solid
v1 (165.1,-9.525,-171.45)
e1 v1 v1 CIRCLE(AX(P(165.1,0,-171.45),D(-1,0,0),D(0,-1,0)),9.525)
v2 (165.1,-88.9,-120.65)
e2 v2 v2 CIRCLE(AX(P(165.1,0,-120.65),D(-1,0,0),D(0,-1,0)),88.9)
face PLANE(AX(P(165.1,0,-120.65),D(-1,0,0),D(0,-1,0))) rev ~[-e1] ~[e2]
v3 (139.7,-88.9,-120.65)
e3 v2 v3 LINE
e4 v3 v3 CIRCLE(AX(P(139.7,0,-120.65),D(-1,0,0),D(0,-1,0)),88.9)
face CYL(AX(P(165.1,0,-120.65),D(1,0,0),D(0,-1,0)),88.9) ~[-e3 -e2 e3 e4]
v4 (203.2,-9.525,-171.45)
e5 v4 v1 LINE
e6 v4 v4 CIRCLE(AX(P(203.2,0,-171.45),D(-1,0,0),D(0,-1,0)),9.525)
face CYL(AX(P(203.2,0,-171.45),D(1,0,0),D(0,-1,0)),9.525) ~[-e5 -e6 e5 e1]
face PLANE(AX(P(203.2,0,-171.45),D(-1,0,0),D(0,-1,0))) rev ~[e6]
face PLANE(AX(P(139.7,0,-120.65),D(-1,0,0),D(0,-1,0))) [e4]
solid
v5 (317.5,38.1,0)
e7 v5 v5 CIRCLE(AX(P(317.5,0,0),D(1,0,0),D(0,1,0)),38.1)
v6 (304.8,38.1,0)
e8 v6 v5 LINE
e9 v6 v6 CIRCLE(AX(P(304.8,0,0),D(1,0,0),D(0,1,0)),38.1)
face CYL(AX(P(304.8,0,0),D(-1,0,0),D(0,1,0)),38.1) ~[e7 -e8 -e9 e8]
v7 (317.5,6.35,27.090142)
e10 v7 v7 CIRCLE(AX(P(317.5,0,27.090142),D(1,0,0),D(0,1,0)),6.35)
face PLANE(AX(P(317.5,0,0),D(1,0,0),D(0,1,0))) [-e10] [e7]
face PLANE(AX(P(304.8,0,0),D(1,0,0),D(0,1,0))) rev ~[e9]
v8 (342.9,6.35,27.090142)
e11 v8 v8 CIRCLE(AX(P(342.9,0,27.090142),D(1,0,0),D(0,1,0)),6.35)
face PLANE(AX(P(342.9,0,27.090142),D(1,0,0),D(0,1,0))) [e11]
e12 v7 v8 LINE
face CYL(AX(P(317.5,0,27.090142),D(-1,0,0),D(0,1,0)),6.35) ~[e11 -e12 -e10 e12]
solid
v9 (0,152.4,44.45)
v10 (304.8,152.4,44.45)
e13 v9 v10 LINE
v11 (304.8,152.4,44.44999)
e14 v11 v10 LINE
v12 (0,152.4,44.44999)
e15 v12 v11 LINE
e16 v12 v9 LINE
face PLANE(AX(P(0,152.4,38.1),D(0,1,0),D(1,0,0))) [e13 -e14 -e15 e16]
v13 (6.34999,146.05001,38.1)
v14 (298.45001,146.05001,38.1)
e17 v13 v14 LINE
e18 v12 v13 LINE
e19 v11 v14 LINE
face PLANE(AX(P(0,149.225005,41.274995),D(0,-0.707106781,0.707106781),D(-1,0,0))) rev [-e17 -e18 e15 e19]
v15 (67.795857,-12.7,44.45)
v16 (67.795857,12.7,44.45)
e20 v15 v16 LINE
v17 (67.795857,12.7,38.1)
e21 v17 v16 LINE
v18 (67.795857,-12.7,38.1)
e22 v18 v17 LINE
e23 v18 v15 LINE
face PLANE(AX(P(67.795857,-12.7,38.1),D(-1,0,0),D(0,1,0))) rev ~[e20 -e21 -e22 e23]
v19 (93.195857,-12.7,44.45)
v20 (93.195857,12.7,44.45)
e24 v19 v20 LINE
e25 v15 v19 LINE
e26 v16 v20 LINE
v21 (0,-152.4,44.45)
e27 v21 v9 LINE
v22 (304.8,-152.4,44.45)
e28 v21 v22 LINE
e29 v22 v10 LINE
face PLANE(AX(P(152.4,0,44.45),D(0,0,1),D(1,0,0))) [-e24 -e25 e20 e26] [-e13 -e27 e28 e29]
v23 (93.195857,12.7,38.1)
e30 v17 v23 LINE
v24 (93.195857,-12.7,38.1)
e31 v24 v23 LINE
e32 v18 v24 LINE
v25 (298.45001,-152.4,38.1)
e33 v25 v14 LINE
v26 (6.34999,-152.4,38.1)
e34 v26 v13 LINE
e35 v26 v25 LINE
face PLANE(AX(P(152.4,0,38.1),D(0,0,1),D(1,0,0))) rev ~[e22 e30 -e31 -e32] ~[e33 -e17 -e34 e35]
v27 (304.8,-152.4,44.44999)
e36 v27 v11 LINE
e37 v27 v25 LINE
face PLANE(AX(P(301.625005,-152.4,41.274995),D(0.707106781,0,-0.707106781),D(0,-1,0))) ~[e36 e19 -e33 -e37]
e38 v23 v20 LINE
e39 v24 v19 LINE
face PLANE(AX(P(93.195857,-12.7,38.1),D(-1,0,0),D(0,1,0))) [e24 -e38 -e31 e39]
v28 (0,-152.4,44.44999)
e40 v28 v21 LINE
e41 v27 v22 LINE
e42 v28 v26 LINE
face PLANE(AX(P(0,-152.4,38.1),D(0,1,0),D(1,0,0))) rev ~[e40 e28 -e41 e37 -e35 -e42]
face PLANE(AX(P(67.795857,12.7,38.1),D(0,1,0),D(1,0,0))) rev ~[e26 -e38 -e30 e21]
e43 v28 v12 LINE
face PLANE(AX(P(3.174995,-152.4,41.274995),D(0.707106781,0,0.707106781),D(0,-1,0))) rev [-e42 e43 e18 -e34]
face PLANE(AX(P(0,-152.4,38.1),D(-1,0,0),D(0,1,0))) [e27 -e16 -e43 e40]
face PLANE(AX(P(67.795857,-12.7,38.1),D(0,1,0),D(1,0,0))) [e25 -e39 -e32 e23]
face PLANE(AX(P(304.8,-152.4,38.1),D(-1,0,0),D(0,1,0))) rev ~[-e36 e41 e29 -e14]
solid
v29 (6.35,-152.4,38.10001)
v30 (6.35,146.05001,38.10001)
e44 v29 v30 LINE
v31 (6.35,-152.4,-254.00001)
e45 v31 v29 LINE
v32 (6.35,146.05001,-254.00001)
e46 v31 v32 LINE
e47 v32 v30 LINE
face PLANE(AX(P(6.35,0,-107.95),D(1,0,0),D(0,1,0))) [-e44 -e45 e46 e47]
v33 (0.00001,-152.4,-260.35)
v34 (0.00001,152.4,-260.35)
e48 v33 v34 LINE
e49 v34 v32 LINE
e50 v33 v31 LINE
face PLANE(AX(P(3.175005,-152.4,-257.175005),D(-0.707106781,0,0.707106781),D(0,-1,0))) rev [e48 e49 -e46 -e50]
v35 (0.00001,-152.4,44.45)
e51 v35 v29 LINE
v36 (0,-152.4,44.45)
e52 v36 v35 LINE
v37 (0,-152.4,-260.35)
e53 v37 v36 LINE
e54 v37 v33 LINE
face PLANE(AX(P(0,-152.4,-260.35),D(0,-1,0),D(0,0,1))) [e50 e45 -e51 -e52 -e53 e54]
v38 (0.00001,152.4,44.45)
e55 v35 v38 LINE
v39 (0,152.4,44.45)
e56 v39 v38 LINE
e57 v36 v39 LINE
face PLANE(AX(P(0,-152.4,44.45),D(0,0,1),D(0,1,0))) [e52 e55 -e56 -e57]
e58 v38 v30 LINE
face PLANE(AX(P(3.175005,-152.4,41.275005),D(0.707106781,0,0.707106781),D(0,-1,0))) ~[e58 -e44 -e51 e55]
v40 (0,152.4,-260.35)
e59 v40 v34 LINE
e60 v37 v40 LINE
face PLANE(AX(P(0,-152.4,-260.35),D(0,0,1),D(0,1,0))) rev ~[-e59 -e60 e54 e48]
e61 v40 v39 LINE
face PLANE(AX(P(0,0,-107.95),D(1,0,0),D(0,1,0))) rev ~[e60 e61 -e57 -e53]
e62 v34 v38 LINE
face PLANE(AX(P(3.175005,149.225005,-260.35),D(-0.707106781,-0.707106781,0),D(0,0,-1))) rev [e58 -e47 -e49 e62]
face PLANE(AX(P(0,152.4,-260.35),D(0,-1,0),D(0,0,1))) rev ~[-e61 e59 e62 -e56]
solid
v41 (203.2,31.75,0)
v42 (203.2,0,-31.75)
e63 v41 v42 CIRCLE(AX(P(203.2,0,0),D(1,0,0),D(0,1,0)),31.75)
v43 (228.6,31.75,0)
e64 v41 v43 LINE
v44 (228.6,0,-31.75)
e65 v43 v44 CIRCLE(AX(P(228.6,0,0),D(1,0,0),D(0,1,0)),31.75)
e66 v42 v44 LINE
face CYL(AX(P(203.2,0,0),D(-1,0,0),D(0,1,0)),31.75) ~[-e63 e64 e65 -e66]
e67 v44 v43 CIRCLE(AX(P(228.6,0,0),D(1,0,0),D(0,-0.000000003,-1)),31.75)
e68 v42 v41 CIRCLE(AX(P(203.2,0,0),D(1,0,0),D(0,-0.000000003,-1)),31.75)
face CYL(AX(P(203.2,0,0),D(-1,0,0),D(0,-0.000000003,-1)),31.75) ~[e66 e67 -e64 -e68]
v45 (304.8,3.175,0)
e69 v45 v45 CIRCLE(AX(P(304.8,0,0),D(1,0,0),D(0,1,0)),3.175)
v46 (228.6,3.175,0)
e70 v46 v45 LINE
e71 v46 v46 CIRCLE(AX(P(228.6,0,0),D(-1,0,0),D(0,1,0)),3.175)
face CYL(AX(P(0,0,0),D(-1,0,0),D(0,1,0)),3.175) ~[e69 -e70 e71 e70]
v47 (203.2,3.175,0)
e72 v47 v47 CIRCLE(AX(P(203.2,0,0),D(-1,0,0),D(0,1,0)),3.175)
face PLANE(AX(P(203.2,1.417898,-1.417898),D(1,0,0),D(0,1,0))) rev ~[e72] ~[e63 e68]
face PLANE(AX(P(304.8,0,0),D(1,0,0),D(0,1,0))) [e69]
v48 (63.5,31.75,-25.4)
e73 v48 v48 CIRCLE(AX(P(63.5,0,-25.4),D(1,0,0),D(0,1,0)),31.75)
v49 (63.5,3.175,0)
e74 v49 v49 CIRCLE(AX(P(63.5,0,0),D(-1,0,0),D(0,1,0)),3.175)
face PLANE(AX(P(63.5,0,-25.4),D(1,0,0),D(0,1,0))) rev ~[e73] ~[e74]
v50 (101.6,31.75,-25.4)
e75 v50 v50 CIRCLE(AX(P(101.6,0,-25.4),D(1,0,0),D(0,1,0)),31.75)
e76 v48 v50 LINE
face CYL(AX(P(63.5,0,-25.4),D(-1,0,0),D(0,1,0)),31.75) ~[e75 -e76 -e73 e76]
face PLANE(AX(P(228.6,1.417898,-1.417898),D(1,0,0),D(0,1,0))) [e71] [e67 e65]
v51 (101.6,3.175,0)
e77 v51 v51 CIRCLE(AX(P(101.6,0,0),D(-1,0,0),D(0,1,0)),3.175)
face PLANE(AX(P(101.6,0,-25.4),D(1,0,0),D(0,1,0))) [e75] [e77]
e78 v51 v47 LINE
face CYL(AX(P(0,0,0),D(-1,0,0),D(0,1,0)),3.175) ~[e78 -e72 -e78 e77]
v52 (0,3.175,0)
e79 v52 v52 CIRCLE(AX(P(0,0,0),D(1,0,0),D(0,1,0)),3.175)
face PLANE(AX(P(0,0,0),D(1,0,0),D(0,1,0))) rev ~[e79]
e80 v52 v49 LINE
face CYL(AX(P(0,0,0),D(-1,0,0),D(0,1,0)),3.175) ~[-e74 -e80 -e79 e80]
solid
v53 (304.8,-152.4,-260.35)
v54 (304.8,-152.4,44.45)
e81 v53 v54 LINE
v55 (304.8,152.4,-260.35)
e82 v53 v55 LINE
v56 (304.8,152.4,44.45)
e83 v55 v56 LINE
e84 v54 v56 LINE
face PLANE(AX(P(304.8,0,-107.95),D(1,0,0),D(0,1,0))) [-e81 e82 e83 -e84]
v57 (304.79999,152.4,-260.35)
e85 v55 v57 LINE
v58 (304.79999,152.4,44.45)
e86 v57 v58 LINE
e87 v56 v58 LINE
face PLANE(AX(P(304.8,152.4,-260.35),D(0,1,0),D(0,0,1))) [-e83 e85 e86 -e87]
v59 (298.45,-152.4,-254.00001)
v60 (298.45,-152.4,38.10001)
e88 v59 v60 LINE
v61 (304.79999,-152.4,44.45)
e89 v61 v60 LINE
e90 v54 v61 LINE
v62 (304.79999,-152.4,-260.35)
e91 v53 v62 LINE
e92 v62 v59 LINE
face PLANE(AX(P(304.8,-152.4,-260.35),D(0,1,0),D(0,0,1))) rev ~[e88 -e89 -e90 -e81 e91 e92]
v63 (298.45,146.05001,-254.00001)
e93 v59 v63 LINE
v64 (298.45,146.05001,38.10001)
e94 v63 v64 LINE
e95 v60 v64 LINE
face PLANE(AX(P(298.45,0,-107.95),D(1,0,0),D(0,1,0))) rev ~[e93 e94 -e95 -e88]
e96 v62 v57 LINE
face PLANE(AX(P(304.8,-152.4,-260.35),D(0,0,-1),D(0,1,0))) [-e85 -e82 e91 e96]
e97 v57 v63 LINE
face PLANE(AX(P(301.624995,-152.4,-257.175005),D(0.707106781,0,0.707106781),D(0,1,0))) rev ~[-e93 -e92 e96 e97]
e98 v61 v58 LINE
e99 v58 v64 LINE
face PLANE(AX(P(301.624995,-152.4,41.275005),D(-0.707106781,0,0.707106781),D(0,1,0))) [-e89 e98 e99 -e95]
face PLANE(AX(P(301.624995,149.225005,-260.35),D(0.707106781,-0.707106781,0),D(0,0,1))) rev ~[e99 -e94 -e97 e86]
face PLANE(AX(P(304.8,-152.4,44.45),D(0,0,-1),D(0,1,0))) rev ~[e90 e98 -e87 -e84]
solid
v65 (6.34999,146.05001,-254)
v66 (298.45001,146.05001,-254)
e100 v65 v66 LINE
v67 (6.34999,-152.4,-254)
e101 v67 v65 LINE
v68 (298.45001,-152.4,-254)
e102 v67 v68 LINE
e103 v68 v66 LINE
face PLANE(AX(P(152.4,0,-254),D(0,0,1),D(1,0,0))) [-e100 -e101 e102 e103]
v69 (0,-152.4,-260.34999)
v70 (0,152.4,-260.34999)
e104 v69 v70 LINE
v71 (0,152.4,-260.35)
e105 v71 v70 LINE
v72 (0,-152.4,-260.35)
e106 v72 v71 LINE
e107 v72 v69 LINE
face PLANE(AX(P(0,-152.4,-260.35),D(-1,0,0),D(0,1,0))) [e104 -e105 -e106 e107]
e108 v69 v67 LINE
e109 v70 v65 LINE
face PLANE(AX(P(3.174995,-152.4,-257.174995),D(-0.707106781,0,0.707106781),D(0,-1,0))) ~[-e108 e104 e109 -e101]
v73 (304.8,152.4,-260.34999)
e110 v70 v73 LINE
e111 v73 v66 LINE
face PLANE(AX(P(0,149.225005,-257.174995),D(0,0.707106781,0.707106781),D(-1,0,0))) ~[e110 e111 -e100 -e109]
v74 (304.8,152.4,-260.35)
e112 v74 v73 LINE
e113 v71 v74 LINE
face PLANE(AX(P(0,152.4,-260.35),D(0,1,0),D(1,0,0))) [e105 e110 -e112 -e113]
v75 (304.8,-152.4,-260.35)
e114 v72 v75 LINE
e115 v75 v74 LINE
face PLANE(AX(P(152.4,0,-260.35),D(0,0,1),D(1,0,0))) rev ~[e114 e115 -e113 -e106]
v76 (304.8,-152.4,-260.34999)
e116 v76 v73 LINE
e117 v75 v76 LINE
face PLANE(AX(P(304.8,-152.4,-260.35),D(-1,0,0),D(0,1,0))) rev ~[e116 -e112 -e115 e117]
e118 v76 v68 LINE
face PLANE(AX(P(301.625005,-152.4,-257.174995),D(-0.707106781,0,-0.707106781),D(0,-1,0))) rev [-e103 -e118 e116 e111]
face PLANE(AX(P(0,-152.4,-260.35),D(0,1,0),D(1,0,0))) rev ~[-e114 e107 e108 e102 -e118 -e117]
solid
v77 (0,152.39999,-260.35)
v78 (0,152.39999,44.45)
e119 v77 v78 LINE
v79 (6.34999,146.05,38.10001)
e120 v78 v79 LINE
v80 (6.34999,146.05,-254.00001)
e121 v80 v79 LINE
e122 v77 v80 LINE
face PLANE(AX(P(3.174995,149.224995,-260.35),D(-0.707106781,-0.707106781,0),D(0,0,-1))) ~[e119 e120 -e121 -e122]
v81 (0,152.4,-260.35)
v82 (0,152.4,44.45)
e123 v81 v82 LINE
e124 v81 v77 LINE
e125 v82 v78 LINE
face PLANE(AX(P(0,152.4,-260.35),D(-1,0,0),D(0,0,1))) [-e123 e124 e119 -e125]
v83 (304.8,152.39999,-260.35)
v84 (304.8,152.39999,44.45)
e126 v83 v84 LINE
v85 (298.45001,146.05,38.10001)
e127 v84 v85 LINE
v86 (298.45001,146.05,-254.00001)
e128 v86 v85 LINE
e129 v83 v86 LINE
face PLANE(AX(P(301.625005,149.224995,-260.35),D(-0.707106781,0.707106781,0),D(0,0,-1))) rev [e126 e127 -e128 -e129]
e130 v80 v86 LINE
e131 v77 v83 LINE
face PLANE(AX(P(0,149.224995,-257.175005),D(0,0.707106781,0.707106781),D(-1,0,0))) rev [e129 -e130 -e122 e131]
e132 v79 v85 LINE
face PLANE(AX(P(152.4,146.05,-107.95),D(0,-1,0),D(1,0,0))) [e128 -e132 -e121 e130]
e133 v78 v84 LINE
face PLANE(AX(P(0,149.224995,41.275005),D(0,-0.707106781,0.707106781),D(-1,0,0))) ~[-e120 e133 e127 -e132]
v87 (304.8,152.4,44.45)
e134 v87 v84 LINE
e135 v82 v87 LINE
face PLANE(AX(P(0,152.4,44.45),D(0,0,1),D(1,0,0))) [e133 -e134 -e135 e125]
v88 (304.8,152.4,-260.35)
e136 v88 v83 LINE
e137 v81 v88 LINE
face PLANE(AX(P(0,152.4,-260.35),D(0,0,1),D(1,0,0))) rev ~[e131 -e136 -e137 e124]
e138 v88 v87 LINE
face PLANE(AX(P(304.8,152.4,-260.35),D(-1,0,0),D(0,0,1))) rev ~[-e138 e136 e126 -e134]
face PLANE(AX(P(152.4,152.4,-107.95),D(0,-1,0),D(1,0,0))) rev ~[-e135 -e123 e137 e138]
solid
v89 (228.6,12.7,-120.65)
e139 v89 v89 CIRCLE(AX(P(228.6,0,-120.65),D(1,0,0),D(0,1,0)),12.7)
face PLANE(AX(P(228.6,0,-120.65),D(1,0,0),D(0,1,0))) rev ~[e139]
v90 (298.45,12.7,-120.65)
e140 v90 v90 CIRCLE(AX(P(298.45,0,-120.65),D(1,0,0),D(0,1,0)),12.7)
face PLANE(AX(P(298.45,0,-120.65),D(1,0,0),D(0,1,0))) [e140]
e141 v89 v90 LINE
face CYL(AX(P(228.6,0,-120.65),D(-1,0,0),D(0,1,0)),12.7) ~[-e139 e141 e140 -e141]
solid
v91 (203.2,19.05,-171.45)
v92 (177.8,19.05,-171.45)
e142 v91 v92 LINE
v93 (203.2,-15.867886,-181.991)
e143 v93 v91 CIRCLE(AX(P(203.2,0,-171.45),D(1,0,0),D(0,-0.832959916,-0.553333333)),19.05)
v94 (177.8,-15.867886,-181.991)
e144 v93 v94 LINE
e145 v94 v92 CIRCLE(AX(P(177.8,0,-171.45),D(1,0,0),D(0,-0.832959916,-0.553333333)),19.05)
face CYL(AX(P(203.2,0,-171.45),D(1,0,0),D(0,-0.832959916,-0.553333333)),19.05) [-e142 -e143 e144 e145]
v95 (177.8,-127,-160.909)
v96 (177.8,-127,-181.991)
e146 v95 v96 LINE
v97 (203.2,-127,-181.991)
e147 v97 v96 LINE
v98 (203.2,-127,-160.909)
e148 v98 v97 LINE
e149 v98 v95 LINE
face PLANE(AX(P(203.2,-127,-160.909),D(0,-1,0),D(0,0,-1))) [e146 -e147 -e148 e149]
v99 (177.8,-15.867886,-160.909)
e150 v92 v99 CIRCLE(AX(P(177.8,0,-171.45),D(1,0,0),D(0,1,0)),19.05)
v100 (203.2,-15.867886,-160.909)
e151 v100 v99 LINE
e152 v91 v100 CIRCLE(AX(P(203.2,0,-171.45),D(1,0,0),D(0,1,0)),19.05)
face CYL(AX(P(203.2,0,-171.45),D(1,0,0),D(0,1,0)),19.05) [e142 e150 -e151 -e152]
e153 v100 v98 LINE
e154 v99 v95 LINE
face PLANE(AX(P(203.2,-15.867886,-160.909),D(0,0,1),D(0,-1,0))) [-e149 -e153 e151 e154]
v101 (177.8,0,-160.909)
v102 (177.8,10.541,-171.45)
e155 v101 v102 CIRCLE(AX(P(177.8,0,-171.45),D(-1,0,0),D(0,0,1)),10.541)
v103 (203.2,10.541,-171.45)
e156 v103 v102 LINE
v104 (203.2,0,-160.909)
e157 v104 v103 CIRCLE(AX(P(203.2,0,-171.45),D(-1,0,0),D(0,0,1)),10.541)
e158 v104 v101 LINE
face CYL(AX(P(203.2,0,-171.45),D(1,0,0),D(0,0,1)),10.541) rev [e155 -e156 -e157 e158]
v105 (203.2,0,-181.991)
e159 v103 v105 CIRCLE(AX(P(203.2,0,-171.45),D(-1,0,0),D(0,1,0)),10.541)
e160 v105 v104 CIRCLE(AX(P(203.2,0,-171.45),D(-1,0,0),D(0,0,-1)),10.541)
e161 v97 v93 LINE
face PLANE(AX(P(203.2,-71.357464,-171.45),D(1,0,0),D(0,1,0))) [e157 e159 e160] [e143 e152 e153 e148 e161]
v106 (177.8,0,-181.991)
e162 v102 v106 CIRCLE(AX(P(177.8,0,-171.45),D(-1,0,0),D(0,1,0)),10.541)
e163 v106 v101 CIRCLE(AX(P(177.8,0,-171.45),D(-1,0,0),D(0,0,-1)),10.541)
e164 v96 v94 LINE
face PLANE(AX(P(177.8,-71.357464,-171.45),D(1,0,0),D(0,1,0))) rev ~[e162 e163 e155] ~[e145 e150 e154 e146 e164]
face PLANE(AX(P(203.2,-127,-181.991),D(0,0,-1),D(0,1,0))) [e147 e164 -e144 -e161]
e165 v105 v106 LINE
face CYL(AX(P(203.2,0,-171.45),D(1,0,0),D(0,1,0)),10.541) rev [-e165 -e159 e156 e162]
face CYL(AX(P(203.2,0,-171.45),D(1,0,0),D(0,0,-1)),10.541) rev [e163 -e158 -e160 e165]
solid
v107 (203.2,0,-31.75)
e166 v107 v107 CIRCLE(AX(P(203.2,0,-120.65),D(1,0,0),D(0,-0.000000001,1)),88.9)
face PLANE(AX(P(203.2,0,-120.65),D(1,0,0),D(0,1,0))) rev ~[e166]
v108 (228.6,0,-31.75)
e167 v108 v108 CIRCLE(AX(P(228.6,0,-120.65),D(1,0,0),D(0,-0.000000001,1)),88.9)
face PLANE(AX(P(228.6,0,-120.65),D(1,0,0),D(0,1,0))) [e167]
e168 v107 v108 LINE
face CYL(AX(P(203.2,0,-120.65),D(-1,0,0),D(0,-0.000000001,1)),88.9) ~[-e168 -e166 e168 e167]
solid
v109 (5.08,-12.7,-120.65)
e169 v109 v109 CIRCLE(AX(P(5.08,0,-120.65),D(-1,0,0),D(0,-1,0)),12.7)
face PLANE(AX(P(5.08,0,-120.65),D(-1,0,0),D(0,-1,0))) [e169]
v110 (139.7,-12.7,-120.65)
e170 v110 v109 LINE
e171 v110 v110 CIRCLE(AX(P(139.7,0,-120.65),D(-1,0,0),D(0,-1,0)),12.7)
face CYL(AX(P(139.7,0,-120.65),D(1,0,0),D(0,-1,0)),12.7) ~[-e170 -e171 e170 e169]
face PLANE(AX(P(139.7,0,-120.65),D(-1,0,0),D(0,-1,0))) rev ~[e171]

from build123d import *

# Parameters (mm, degrees)
F0_R      = 3.175
F1_DEPTH  = 304.8
F3_R      = 31.75
F4_DEPTH  = 38.1
F6_W      = 304.8
F6_H      = 304.8
F6_W_2    = 25.4
F6_H_2    = 25.4
F7_DEPTH  = 6.35
F8_SIZE   = 6.34999
F9_W      = 304.8
F9_H      = 304.8
F10_DEPTH = 6.35
F11_SIZE  = 6.34999
F13_W     = 304.8
F13_H     = 304.8
F14_DEPTH = 6.35
F15_SIZE  = 6.34999
F17_W     = 304.8
F17_H     = 304.8
F18_DEPTH = 6.35
F19_SIZE  = 6.34999
F22_DEPTH = 25.4
F23_R     = 9.525
F24_DEPTH = 38.1
F26_W     = 304.8
F26_H     = 304.8
F27_DEPTH = 6.35
F28_SIZE  = 6.34999
F29_R     = 38.1
F30_DEPTH = 12.7
F31_R     = 6.35
F32_DEPTH = 25.4
F33_R     = 12.7
F34_DEPTH = 69.85
F36_R     = 88.9
F37_DEPTH = 25.4
F38_R     = 12.7
F39_DEPTH = 134.62
F41_DEPTH = 25.4


# Not quite as in the source:
# - a fillet or chamfer is up to 0.001 mm smaller than in the source, because OpenCascade refuses the exact size
# - a feature of the source that left no trace in its solid (it failed there, or was rolled back) is left out


with BuildPart() as f1:
    # F0 (on Right) → F1 (new body)
    with BuildSketch(Plane.YZ):
        Circle(F0_R)
    extrude(amount=F1_DEPTH)

    # F3 (on offset) → F4 (join)
    with BuildSketch(Plane.YZ.offset(63.5)):
        with Locations((0, -25.4)):
            Circle(F3_R)
    extrude(amount=F4_DEPTH)

    # F21 (on offset) → F22, piece 2 (join)
    with BuildSketch(Plane.YZ.offset(203.2)):
        with BuildLine():
            ThreePointArc((-9.51e-08, -31.75), (22.4506402691, -22.4506403363), (31.75, 0))
            ThreePointArc((31.75, 0), (-22.4506402691, 22.4506403363), (-9.51e-08, -31.75))
        make_face()
    extrude(amount=F22_DEPTH)


with BuildPart() as f7:
    # F6 (on offset) → F7 (new body)
    with BuildSketch(Plane.XY.offset(38.1)):
        with Locations((152.4, 0)):
            Rectangle(F6_W, F6_H)
        with Locations((80.4958567023, 0)):
            Rectangle(F6_W_2, F6_H_2, mode=Mode.SUBTRACT)
    extrude(amount=F7_DEPTH)

    # F8 (size 6.35 in the source; OpenCascade refuses exactly that, so slightly less here)
    f8_edges = [f7.edges().sort_by_distance(p)[0] for p in [
        (304.8, 0, 38.1),
        (152.4, 152.4, 38.1),
        (0, 0, 38.1),
    ]]
    chamfer(f8_edges, length=F8_SIZE)


with BuildPart() as f10:
    # F9 (on Right) → F10 (new body)
    with BuildSketch(Plane.YZ):
        with Locations((0, -107.95)):
            Rectangle(F9_W, F9_H)
    extrude(amount=F10_DEPTH)

    # F11 (size 6.35 in the source; OpenCascade refuses exactly that, so slightly less here)
    f11_edges = [f10.edges().sort_by_distance(p)[0] for p in [
        (6.35, 0, 44.45),
        (6.35, 0, -260.35),
        (6.35, 152.4, -107.95),
    ]]
    chamfer(f11_edges, length=F11_SIZE)


with BuildPart() as f14:
    # F13 (on offset) → F14 (new body)
    with BuildSketch(Plane.XZ.offset(-152.4)):
        with Locations((152.4, -107.95)):
            Rectangle(F13_W, F13_H)
    extrude(amount=F14_DEPTH)

    # F15 (size 6.35 in the source; OpenCascade refuses exactly that, so slightly less here)
    f15_edges = [f14.edges().sort_by_distance(p)[0] for p in [
        (152.4, 146.05, 44.45),
        (304.8, 146.05, -107.95),
        (152.4, 146.05, -260.35),
        (0, 146.05, -107.95),
    ]]
    chamfer(f15_edges, length=F15_SIZE)


with BuildPart() as f18:
    # F17 (on offset) → F18 (new body)
    with BuildSketch(Plane.XY.offset(-260.35)):
        with Locations((152.4, 0)):
            Rectangle(F17_W, F17_H)
    extrude(amount=F18_DEPTH)

    # F19 (size 6.35 in the source; OpenCascade refuses exactly that, so slightly less here)
    f19_edges = [f18.edges().sort_by_distance(p)[0] for p in [
        (0, 0, -254),
        (152.4, 152.4, -254),
        (304.8, 0, -254),
    ]]
    chamfer(f19_edges, length=F19_SIZE)


with BuildPart() as f22:
    # F21 (on offset) → F22 (new body)
    with BuildSketch(Plane.YZ.offset(203.2)):
        with BuildLine():
            ThreePointArc((88.9, -120.65), (62.8617928139, -57.7882071189), (-9.51e-08, -31.75))
            ThreePointArc((-9.51e-08, -31.75), (-62.8617928139, -183.5117928811), (88.9, -120.65))
        make_face()
    extrude(amount=F22_DEPTH)


with BuildPart() as f24:
    # F23 (on face) → F24 (new body)
    with BuildSketch(Plane(origin=(203.2, 0, 0), x_dir=(0, -1, 0), z_dir=(-1, 0, 0))):
        with Locations((0, -171.45)):
            Circle(F23_R)
    extrude(amount=F24_DEPTH)

    # F36 (on offset) → F37 (join)
    with BuildSketch(Plane(origin=(165.1, 0, 0), x_dir=(0, -1, 0), z_dir=(-1, 0, 0))):
        with Locations((0, -120.65)):
            Circle(F36_R)
    extrude(amount=F37_DEPTH)


with BuildPart() as f27:
    # F26 (on offset) → F27 (new body)
    with BuildSketch(Plane.YZ.offset(304.8)):
        with Locations((0, -107.95)):
            Rectangle(F26_W, F26_H)
    extrude(amount=-F27_DEPTH)

    # F28 (size 6.35 in the source; OpenCascade refuses exactly that, so slightly less here)
    f28_edges = [f27.edges().sort_by_distance(p)[0] for p in [
        (298.45, 0, 44.45),
        (298.45, 152.4, -107.95),
        (298.45, 0, -260.35),
    ]]
    chamfer(f28_edges, length=F28_SIZE)


with BuildPart() as f30:
    # F29 (on face) → F30 (new body)
    with BuildSketch(Plane.YZ.offset(304.8)):
        Circle(F29_R)
    extrude(amount=F30_DEPTH)

    # F31 (on face) → F32 (join)
    with BuildSketch(Plane.YZ.offset(317.5)):
        with Locations((0, 27.0901415497)):
            Circle(F31_R)
    extrude(amount=F32_DEPTH)


with BuildPart() as f34:
    # F33 (on face) → F34 (new body)
    with BuildSketch(Plane.YZ.offset(228.6)):
        with Locations((0, -120.65)):
            Circle(F33_R)
    extrude(amount=F34_DEPTH)


with BuildPart() as f39:
    # F38 (on face) → F39 (new body)
    with BuildSketch(Plane(origin=(139.7, 0, 0), x_dir=(0, -1, 0), z_dir=(-1, 0, 0))):
        with Locations((0, -120.65)):
            Circle(F38_R)
    extrude(amount=F39_DEPTH)


with BuildPart() as f41:
    # F40 (on face) → F41 (new body)
    with BuildSketch(Plane.YZ.offset(203.2)):
        with BuildLine():
            ThreePointArc((-15.8678864062, -181.991), (-19.05, -171.45), (-15.8678864062, -160.909))
            Line((-15.8678864062, -160.909), (-127, -160.909))
            Line((-127, -160.909), (-127, -181.991))
            Line((-127, -181.991), (-15.8678864062, -181.991))
        make_face()
        with BuildLine():
            Line((0, -160.909), (-15.8678864062, -160.909))
            ThreePointArc((-15.8678864062, -160.909), (-19.05, -171.45), (-15.8678864062, -181.991))
            Line((-15.8678864062, -181.991), (0, -181.991))
            ThreePointArc((0, -181.991), (-10.541, -171.45), (0, -160.909))
        make_face()
        with BuildLine():
            ThreePointArc((-15.8678864062, -181.991), (5.5054184202, -189.6871288316), (19.05, -171.45))
            ThreePointArc((19.05, -171.45), (5.5054184202, -153.2128711684), (-15.8678864062, -160.909))
            Line((-15.8678864062, -160.909), (0, -160.909))
            ThreePointArc((0, -160.909), (7.4536125805, -163.9963874195), (10.541, -171.45))
            ThreePointArc((10.541, -171.45), (7.4536125805, -178.9036125805), (0, -181.991))
            Line((0, -181.991), (-15.8678864062, -181.991))
        make_face()
    extrude(amount=-F41_DEPTH)


solid = Compound([f1.part, f7.part, f10.part, f14.part, f18.part, f22.part, f24.part, f27.part, f30.part, f34.part, f39.part, f41.part])
